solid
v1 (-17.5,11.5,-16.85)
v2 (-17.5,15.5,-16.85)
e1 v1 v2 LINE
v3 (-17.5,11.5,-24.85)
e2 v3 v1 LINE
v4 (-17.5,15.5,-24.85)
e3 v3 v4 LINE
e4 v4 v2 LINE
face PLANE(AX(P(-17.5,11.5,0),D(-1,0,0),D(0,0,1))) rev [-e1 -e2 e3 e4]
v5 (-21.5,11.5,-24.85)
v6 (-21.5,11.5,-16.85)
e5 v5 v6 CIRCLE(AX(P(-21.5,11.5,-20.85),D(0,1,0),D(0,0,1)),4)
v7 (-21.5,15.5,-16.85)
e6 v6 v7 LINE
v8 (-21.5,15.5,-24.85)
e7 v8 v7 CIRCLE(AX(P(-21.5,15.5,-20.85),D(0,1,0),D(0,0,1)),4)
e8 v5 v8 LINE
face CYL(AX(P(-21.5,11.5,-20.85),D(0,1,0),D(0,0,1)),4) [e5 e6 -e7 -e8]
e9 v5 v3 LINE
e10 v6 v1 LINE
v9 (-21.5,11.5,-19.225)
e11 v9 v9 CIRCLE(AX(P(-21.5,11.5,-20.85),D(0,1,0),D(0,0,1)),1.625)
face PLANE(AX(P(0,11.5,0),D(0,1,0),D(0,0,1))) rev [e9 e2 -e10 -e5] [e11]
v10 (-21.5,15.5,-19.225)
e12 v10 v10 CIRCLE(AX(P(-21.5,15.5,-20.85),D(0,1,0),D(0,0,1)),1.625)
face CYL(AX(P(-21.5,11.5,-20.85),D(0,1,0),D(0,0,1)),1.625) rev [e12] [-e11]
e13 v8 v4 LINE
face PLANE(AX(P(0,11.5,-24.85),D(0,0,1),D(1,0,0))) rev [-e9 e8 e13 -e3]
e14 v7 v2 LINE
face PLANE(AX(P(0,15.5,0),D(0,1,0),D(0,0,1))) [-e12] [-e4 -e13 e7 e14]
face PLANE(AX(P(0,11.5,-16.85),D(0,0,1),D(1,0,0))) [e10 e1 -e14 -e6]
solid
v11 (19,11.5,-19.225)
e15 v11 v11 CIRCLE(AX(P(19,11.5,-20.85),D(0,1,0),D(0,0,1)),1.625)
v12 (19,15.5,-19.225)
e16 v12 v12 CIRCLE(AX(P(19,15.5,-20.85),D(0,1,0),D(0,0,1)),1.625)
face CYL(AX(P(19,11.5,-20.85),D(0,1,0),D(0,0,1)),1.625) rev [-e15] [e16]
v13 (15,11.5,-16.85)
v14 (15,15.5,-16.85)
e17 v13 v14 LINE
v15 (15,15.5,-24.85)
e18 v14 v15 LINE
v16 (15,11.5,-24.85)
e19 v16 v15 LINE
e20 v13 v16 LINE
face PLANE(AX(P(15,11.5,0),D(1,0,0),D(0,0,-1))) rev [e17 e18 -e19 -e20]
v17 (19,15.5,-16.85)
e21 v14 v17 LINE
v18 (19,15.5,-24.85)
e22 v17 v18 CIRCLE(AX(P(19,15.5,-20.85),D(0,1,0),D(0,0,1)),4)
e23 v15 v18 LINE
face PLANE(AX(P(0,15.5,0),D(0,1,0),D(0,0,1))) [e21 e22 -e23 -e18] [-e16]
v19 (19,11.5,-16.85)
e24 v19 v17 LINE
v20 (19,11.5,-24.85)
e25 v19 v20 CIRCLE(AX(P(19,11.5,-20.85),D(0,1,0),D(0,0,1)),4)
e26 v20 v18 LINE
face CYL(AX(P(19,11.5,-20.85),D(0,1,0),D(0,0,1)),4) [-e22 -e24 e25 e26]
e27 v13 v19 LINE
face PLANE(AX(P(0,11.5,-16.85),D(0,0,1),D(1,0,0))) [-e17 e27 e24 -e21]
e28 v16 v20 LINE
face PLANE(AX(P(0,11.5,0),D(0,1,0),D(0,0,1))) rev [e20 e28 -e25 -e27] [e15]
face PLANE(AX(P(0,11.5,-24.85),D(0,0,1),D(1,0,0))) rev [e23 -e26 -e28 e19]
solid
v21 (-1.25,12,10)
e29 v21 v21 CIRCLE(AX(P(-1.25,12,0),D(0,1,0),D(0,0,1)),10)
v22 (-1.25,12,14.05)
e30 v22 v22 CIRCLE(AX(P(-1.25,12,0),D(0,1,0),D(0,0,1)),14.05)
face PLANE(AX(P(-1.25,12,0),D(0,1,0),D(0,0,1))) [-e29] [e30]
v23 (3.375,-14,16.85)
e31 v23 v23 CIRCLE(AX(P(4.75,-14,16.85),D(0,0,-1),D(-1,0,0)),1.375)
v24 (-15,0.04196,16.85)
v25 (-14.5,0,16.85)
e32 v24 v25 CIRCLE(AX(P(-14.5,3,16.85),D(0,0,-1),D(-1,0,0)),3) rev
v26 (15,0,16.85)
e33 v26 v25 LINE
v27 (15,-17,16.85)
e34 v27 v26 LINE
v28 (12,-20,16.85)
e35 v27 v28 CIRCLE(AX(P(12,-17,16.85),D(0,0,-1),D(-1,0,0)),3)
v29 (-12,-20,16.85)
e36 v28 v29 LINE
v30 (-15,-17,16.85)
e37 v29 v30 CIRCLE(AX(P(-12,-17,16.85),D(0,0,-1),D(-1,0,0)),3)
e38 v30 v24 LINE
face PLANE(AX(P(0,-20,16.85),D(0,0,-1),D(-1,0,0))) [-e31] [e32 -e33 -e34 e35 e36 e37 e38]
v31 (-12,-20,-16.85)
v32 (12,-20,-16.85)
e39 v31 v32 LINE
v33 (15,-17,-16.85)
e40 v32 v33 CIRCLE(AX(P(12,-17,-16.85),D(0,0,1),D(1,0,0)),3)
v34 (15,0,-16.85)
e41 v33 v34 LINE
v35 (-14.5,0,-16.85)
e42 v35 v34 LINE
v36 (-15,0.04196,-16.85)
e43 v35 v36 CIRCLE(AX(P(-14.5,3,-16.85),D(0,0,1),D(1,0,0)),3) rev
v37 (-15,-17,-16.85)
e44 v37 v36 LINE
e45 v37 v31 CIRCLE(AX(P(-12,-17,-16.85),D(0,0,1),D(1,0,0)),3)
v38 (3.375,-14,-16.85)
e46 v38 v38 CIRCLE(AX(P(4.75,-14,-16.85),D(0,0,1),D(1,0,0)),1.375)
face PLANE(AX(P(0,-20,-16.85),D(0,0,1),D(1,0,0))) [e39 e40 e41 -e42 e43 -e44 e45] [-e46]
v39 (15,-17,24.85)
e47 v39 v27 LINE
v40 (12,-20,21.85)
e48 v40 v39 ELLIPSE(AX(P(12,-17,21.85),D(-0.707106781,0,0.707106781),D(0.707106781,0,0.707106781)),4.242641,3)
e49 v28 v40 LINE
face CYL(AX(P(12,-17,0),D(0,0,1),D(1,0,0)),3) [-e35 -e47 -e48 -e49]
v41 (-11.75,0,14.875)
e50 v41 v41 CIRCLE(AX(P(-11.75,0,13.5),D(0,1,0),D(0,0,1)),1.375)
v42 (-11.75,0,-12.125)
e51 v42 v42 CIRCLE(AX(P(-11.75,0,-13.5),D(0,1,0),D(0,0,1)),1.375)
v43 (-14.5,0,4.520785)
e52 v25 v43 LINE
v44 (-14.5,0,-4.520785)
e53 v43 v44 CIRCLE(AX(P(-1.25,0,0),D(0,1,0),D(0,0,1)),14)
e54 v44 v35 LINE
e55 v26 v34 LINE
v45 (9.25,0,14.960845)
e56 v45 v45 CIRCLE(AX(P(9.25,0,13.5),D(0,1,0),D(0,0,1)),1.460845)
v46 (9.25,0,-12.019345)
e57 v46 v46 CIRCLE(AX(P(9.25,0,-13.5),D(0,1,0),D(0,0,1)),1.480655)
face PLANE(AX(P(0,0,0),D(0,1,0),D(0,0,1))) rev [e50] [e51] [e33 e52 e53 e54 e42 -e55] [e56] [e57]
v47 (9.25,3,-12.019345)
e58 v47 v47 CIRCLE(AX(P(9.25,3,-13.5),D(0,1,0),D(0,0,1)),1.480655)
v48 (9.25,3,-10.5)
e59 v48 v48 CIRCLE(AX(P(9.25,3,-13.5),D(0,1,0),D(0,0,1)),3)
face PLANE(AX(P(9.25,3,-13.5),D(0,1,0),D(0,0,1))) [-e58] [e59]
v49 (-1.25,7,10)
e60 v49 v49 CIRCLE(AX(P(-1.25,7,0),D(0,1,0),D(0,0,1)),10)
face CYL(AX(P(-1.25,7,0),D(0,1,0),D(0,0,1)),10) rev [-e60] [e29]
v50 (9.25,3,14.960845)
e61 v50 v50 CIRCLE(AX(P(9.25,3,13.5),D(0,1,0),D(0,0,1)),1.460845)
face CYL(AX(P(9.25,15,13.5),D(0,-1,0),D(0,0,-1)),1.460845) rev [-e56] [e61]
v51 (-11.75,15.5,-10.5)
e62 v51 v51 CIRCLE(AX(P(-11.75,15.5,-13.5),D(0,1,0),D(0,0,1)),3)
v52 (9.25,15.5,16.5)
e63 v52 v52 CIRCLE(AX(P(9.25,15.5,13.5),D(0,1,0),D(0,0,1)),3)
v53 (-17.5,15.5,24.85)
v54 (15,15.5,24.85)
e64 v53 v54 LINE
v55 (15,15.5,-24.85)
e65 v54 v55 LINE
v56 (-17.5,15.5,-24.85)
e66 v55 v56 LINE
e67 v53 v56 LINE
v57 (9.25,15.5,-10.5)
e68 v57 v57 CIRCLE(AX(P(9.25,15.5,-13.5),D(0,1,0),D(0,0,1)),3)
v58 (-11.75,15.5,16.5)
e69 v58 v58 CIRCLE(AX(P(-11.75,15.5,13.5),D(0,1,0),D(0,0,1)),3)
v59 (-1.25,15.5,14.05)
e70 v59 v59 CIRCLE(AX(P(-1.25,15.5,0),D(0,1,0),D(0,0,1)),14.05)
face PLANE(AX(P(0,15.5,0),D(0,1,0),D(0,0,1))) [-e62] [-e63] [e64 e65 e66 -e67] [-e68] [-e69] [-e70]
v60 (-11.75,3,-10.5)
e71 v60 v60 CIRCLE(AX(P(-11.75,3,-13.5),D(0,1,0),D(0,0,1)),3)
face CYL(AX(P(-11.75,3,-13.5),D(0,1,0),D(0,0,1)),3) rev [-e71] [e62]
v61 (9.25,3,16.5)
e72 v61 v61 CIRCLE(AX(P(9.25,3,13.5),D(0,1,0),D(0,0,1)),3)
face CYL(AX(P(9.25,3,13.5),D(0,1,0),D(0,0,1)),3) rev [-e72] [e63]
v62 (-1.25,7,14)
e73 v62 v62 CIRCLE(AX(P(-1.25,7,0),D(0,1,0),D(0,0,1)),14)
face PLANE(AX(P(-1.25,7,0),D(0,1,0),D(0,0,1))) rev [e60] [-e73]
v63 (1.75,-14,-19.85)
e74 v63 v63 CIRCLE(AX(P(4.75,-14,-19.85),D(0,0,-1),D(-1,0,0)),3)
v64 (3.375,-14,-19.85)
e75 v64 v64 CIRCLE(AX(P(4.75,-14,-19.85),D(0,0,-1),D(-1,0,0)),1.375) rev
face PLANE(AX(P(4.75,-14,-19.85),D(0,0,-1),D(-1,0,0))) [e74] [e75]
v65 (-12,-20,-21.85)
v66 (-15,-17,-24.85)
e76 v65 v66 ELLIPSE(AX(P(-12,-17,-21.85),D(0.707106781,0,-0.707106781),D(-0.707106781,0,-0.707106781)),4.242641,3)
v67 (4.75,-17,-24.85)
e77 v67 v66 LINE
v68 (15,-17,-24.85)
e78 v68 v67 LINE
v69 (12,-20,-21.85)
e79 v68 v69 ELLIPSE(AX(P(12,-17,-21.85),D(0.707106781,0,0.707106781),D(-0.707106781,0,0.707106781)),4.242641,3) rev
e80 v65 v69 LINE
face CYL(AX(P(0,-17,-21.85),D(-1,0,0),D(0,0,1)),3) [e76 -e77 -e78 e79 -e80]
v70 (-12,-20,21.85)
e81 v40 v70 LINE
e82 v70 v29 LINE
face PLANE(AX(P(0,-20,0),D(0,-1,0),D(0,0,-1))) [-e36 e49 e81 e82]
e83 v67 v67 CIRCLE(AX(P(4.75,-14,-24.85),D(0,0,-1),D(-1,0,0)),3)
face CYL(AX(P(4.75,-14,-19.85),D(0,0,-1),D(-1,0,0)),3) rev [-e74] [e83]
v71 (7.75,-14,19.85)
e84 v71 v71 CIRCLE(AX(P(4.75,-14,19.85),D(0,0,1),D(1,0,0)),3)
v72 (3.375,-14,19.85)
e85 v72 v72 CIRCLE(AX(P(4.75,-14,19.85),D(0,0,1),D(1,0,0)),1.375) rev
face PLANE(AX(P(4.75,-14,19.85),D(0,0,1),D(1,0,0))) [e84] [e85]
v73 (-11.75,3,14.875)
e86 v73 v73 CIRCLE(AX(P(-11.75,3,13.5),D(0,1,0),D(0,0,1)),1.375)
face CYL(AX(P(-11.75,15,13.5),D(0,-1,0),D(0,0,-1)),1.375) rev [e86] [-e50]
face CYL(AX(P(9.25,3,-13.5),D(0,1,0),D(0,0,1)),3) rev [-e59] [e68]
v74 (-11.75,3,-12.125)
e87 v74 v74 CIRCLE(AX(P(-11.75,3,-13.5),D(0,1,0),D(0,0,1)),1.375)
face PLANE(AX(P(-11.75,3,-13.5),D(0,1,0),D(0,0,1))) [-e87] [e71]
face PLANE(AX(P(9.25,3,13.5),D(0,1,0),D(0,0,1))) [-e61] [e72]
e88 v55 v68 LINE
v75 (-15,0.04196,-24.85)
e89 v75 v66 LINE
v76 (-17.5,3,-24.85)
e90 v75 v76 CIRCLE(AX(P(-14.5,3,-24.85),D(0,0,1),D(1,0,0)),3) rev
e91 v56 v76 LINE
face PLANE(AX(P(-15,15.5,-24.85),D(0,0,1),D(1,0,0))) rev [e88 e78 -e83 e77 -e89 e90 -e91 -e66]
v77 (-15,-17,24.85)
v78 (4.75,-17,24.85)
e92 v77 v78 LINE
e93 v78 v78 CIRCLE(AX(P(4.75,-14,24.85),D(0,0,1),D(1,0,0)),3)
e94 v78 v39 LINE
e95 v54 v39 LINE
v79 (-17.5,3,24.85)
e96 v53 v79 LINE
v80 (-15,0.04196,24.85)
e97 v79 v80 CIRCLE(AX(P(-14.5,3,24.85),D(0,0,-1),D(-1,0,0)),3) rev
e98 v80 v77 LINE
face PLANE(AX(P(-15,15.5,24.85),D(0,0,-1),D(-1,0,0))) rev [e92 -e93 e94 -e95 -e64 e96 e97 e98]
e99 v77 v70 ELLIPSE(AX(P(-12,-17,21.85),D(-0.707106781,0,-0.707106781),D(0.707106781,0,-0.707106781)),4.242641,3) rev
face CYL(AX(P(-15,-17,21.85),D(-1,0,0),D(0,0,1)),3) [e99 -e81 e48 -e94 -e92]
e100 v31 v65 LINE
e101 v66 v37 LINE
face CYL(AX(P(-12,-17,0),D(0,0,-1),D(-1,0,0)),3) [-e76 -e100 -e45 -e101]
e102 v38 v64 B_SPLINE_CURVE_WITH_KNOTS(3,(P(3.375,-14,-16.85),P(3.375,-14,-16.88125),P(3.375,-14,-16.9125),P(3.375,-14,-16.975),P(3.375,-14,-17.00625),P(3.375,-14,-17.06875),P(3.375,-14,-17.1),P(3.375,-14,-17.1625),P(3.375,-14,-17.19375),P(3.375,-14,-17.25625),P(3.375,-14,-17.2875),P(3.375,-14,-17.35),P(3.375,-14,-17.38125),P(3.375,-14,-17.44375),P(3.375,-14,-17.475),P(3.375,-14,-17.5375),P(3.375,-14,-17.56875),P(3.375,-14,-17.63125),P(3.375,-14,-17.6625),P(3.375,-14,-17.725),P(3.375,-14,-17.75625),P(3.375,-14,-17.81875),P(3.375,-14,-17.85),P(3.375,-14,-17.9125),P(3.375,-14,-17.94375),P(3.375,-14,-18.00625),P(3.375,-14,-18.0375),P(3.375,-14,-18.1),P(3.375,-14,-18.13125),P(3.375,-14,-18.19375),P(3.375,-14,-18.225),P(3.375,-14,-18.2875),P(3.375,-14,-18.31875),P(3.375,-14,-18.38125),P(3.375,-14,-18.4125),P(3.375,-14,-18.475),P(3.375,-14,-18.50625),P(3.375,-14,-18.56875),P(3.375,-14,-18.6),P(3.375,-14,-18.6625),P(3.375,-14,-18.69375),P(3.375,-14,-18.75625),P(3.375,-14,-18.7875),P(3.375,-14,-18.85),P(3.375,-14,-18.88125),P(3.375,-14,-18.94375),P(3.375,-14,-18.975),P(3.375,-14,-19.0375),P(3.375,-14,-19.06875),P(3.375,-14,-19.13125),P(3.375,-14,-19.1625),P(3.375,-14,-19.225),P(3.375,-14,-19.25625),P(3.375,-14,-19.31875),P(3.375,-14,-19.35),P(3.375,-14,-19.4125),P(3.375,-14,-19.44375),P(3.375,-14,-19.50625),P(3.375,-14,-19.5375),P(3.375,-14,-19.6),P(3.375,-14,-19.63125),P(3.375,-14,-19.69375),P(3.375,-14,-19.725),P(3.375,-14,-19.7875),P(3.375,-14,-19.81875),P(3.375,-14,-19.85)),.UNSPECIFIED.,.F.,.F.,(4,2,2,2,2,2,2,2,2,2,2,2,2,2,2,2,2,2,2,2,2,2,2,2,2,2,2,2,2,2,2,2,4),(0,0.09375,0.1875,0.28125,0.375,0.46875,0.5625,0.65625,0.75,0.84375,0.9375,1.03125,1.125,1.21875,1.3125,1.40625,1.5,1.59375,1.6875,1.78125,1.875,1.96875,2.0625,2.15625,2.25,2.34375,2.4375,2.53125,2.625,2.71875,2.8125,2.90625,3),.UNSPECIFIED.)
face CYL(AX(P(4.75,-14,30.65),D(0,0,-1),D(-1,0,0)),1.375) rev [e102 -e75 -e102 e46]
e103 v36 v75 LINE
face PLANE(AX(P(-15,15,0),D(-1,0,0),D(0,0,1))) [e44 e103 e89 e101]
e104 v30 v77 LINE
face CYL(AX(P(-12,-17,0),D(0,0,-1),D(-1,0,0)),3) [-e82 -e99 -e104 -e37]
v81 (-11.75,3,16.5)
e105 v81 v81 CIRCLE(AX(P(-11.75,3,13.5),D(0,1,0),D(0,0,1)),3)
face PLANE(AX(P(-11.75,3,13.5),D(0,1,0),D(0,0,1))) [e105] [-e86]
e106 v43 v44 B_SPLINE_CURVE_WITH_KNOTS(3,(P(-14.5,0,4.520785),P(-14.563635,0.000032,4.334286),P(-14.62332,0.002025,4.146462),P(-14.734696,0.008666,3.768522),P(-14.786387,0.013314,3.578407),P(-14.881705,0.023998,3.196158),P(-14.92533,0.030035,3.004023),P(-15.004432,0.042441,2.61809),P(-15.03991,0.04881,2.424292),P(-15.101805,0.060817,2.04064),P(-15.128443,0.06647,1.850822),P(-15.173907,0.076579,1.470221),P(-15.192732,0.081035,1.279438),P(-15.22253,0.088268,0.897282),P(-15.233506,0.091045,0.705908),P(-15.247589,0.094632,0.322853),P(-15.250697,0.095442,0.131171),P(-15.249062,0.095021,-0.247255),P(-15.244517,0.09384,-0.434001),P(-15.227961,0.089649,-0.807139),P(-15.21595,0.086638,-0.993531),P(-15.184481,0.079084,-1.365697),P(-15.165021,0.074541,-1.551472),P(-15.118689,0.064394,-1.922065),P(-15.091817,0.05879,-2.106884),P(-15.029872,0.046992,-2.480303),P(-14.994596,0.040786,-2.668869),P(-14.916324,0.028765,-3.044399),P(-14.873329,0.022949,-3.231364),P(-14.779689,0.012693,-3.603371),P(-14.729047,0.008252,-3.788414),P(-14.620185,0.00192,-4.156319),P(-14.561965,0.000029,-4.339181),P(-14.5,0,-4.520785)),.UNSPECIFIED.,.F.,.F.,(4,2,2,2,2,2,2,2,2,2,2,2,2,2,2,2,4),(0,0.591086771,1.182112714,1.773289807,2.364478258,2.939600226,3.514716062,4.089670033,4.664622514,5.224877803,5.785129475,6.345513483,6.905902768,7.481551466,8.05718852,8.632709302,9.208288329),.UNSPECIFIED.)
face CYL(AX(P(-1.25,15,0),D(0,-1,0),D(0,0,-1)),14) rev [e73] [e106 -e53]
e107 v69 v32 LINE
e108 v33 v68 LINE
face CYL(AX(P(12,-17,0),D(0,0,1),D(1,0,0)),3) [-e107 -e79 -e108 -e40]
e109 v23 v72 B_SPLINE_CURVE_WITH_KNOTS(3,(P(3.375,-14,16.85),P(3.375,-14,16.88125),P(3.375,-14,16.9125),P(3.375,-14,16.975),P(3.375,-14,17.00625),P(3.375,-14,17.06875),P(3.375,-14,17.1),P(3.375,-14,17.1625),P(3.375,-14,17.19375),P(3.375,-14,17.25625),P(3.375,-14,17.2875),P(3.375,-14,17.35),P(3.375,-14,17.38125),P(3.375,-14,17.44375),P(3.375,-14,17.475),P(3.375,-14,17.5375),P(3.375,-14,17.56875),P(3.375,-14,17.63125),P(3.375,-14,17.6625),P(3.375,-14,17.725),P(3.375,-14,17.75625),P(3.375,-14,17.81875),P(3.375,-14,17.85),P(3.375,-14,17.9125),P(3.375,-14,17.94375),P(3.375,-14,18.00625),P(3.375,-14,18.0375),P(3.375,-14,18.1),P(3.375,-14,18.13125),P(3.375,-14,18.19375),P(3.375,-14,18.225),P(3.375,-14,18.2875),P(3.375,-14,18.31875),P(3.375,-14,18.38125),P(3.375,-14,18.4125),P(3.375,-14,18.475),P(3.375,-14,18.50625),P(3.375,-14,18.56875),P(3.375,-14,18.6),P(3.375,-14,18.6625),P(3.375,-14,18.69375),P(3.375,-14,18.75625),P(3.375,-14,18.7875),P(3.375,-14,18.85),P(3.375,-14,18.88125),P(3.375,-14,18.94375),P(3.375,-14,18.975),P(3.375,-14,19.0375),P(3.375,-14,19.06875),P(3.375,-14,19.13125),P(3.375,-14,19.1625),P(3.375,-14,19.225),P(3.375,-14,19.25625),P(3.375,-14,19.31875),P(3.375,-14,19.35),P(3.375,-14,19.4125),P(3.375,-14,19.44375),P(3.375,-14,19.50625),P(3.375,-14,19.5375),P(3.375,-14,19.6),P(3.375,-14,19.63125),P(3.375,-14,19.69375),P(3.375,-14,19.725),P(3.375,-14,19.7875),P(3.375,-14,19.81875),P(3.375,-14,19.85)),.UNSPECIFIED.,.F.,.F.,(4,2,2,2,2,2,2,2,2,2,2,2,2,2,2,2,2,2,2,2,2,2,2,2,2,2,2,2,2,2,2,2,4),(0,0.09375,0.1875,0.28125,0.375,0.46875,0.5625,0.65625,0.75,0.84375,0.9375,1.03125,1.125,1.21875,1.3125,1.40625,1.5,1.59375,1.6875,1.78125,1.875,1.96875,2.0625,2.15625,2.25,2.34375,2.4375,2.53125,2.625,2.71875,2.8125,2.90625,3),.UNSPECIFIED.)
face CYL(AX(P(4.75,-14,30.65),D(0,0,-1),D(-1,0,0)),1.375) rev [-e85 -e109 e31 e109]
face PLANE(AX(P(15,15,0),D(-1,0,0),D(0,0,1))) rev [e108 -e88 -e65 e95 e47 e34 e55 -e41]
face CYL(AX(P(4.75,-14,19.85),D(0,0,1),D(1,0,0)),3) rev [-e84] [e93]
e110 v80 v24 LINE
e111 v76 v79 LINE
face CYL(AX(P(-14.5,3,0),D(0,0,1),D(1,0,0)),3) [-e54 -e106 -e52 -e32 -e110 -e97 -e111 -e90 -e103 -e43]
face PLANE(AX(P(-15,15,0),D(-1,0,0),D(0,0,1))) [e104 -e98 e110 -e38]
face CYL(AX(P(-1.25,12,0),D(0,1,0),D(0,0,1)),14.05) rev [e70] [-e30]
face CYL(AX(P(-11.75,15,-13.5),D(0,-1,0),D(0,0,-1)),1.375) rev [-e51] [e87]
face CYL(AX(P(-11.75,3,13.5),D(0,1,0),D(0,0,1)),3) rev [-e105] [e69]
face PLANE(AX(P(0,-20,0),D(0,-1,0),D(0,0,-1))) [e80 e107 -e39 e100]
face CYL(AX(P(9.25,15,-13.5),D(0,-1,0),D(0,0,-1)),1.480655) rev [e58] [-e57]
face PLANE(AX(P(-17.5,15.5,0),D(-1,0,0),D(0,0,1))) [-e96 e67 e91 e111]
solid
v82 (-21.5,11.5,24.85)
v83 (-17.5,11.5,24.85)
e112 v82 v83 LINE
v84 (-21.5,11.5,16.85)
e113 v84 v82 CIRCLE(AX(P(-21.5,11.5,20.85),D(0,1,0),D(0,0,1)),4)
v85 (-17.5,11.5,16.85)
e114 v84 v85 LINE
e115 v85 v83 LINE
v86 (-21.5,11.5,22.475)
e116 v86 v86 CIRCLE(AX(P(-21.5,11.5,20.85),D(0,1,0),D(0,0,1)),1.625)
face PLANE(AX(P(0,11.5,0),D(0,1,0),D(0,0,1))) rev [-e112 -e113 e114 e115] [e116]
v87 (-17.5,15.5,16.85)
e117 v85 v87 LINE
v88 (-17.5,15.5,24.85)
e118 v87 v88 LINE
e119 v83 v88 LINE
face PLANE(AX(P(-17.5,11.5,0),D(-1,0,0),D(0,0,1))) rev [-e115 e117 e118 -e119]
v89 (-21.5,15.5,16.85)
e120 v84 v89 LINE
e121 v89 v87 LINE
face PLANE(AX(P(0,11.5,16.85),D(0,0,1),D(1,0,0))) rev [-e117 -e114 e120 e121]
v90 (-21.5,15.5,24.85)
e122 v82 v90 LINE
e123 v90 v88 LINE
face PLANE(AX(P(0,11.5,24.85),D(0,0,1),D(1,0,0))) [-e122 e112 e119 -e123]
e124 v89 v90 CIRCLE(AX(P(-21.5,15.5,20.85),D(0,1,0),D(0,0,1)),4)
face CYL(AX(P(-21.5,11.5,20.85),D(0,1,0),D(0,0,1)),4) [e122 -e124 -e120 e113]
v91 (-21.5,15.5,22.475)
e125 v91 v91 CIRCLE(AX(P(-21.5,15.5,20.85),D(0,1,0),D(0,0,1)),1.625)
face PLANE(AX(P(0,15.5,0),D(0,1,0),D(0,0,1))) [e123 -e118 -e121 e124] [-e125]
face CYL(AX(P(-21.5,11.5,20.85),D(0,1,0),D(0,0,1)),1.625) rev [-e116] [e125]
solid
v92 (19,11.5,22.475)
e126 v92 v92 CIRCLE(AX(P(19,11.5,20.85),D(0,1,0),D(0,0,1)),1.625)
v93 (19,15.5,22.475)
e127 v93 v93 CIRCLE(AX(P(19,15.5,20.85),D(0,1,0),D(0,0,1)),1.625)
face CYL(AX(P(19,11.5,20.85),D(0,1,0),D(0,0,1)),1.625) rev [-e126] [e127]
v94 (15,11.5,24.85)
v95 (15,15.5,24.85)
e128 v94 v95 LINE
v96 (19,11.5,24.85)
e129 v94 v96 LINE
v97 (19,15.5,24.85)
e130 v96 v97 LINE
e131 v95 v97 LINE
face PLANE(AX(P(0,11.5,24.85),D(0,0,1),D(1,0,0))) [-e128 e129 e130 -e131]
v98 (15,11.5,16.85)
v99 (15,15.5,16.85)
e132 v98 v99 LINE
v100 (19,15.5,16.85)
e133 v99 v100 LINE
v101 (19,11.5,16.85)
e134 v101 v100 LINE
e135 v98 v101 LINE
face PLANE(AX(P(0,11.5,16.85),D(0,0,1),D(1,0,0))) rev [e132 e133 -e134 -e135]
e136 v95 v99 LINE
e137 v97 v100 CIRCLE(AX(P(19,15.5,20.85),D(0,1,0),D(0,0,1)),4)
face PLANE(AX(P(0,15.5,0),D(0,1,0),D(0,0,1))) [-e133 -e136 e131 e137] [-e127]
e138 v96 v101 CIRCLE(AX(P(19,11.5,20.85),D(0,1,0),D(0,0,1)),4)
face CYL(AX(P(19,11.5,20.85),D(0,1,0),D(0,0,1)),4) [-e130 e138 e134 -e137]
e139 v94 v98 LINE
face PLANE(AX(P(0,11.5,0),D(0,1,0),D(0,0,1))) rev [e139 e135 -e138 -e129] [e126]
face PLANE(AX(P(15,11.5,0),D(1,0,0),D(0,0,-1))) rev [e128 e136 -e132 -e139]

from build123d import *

# Parameters (mm, degrees)
SKETCH1_R             = 1.375
SKETCH1_R_2           = 1.460845326
SKETCH1_R_3           = 1.480655282
BOSS_EXTRUDE1_DEPTH   = 15
BOSS_EXTRUDE2_START   = -8
SKETCH2_R             = 14
SKETCH2_R_2           = 10
BOSS_EXTRUDE2_DEPTH   = 8
CUT_EXTRUDE1_START    = -3
SKETCH3_R             = 14
SKETCH3_R_2           = 10
CUT_EXTRUDE1_DEPTH    = 3
SKETCH5_R             = 1.480655282
SKETCH5_R_2           = 1.375
SKETCH5_R_3           = 1.460845326
BOSS_EXTRUDE3_DEPTH   = 0.5
BOSS_EXTRUDE4_DEPTH   = 5
SKETCH7_R             = 3
CUT_EXTRUDE2_DEPTH    = 12.5
SKETCH8_R             = 14.05
CUT_EXTRUDE3_DEPTH    = 3.5
SKETCH9_W             = 30
SKETCH9_H             = 8
BOSS_EXTRUDE6_DEPTH   = 20
BOSS_EXTRUDE6_2_DEPTH = 20
SKETCH10_W            = 30
SKETCH10_H            = 8
BOSS_EXTRUDE7_DEPTH   = 15.5
BOSS_EXTRUDE14_DEPTH  = 15.5
CUT_EXTRUDE11_START   = 15.5
SKETCH16_R            = 14.05
CUT_EXTRUDE11_DEPTH   = 15.5
SKETCH17_R            = 4
SKETCH17_R_2          = 1.625
BOSS_EXTRUDE15_DEPTH  = 4
SKETCH18_R            = 1.375
CUT_EXTRUDE12_DEPTH   = 55.5
SKETCH19_R            = 3
CUT_EXTRUDE13_DEPTH   = 5
CUT_EXTRUDE14_START   = -5
SKETCH20_R            = 3
CUT_EXTRUDE14_DEPTH   = 5
FILLET1_R             = 3
FILLET2_R             = 3


# Some blends are built 0.0001 mm under size
with BuildPart() as part:
    # Sketch1 → Boss-Extrude1 (new body)
    with BuildSketch(Plane(origin=(0, 0, 0), x_dir=(1, 0, 0), z_dir=(0, 1, 0))):
        with BuildLine():
            Line((-15, -16.85), (15, -16.85))
            Line((15, -16.85), (15, 16.85))
            Line((15, 16.85), (-15, 16.85))
            Line((-15, 16.85), (-15, 2.633913438))
            ThreePointArc((-15, 2.633913438), (0.072875656, 13.937359865), (12.75, 0))
            ThreePointArc((12.75, 0), (0.072875656, -13.937359865), (-15, -2.633913438))
            Line((-15, -2.633913438), (-15, -16.85))
        make_face()
        with Locations(Location((-11.75, -13.5, 0), (0, 0, 270))):
            Circle(SKETCH1_R, mode=Mode.SUBTRACT)
        with Locations(Location((9.25, -13.5, 0), (0, 0, 270))):
            Circle(SKETCH1_R_2, mode=Mode.SUBTRACT)
        with Locations(Location((-11.75, 13.5, 0), (0, 0, 270))):
            Circle(SKETCH1_R, mode=Mode.SUBTRACT)
        with Locations(Location((9.25, 13.5, 0), (0, 0, 270))):
            Circle(SKETCH1_R_3, mode=Mode.SUBTRACT)
    extrude(amount=BOSS_EXTRUDE1_DEPTH)

    # Sketch2 → Boss-Extrude2 (add)
    with BuildSketch(Plane(origin=(0, 15, 0), x_dir=(1, 0, 0), z_dir=(0, 1, 0)).offset(BOSS_EXTRUDE2_START)):
        with Locations((-1.25, 0)):
            Circle(SKETCH2_R)
        with Locations(Location((-1.25, 0, 0), (0, 0, 270))):
            Circle(SKETCH2_R_2, mode=Mode.SUBTRACT)
    extrude(amount=BOSS_EXTRUDE2_DEPTH)

    # Sketch3 → Cut-Extrude1 (cut)
    with BuildSketch(Plane(origin=(0, 15, 0), x_dir=(1, 0, 0), z_dir=(0, 1, 0)).offset(CUT_EXTRUDE1_START)):
        with Locations((-1.25, 0)):
            Circle(SKETCH3_R)
        with Locations(Location((-1.25, 0, 0), (0, 0, 270))):
            Circle(SKETCH3_R_2, mode=Mode.SUBTRACT)
    extrude(amount=CUT_EXTRUDE1_DEPTH, mode=Mode.SUBTRACT)

    # Sketch5 → Boss-Extrude3 (add)
    with BuildSketch(Plane(origin=(0, 15, 0), x_dir=(1, 0, 0), z_dir=(0, 1, 0))):
        with BuildLine():
            Line((-15, 16.85), (-15, 2.633913438))
            ThreePointArc((-15, 2.633913438), (12.75, 0), (-15, -2.633913438))
            Line((-15, -2.633913438), (-15, -16.85))
            Line((-15, -16.85), (15, -16.85))
            Line((15, -16.85), (15, 16.85))
            Line((15, 16.85), (-15, 16.85))
        make_face()
        with Locations(Location((9.25, 13.5, 0), (0, 0, 270))):
            Circle(SKETCH5_R, mode=Mode.SUBTRACT)
        with Locations(Location((-11.75, -13.5, 0), (0, 0, 270))):
            Circle(SKETCH5_R_2, mode=Mode.SUBTRACT)
        with Locations(Location((-11.75, 13.5, 0), (0, 0, 270))):
            Circle(SKETCH5_R_2, mode=Mode.SUBTRACT)
        with Locations(Location((9.25, -13.5, 0), (0, 0, 270))):
            Circle(SKETCH5_R_3, mode=Mode.SUBTRACT)
    extrude(amount=BOSS_EXTRUDE3_DEPTH)

    # Sketch6 → Boss-Extrude4 (add)
    with BuildSketch(Plane(origin=(0, 15.5, 0), x_dir=(1, 0, 0), z_dir=(0, 1, 0))):
        with BuildLine():
            ThreePointArc((-1.625, 20.35), (0, 21.975), (1.625, 20.35))
            Line((1.625, 20.35), (3.5, 20.35))
            ThreePointArc((3.5, 20.35), (0, 23.85), (-3.5, 20.35))
            Line((-3.5, 20.35), (-1.625, 20.35))
        make_face()
        with BuildLine():
            Line((3.5, 20.35), (1.625, 20.35))
            ThreePointArc((1.625, 20.35), (0, 18.725), (-1.625, 20.35))
            Line((-1.625, 20.35), (-3.5, 20.35))
            ThreePointArc((-3.5, 20.35), (-2.474873743, 17.875126275), (-2.6e-08, 16.85))
            ThreePointArc((-2.6e-08, 16.85), (2.474873725, 17.875126257), (3.5, 20.35))
        make_face()
        with BuildLine():
            Line((3.5, 16.85), (3.5, 20.35))
            ThreePointArc((3.5, 20.35), (2.474873725, 17.875126257), (-2.6e-08, 16.85))
            Line((-2.6e-08, 16.85), (3.5, 16.85))
        make_face()
        with BuildLine():
            ThreePointArc((-2.6e-08, 16.85), (-2.474873743, 17.875126275), (-3.5, 20.35))
            Line((-3.5, 20.35), (-3.5, 16.85))
            Line((-3.5, 16.85), (-2.6e-08, 16.85))
        make_face()
        with BuildLine():
            ThreePointArc((-3.5, -20.35), (-2.474873734, -17.875126266), (0, -16.85))
            Line((0, -16.85), (-3.5, -16.85))
            Line((-3.5, -16.85), (-3.5, -20.35))
        make_face()
        with BuildLine():
            Line((3.5, -20.35), (3.5, -16.85))
            Line((3.5, -16.85), (0, -16.85))
            ThreePointArc((0, -16.85), (2.474873734, -17.875126266), (3.5, -20.35))
        make_face()
        with BuildLine():
            ThreePointArc((-3.5, -20.35), (0, -23.85), (3.5, -20.35))
            Line((3.5, -20.35), (1.625, -20.35))
            ThreePointArc((1.625, -20.35), (0, -21.975), (-1.625, -20.35))
            Line((-1.625, -20.35), (-3.5, -20.35))
        make_face()
        with BuildLine():
            Line((1.625, -20.35), (3.5, -20.35))
            ThreePointArc((3.5, -20.35), (2.474873734, -17.875126266), (0, -16.85))
            ThreePointArc((0, -16.85), (-2.474873734, -17.875126266), (-3.5, -20.35))
            Line((-3.5, -20.35), (-1.625, -20.35))
            ThreePointArc((-1.625, -20.35), (0, -18.725), (1.625, -20.35))
        make_face()
    extrude(amount=-BOSS_EXTRUDE4_DEPTH)

    # Sketch7 → Cut-Extrude2 (cut)
    with BuildSketch(Plane(origin=(0, 15.5, 0), x_dir=(1, 0, 0), z_dir=(0, 1, 0))):
        with Locations(Location((-11.75, 13.5, 0), (0, 0, 270))):
            Circle(SKETCH7_R)
        with Locations(Location((9.25, 13.5, 0), (0, 0, 270))):
            Circle(SKETCH7_R)
        with Locations(Location((9.25, -13.5, 0), (0, 0, 270))):
            Circle(SKETCH7_R)
        with Locations(Location((-11.75, -13.5, 0), (0, 0, 270))):
            Circle(SKETCH7_R)
    extrude(amount=-CUT_EXTRUDE2_DEPTH, mode=Mode.SUBTRACT)

    # Sketch8 → Cut-Extrude3 (cut)
    with BuildSketch(Plane(origin=(0, 15.5, 0), x_dir=(1, 0, 0), z_dir=(0, 1, 0))):
        with Locations((-1.25, 0)):
            Circle(SKETCH8_R)
    extrude(amount=-CUT_EXTRUDE3_DEPTH, mode=Mode.SUBTRACT)



with BuildPart() as body_2:
    # Sketch9 → Boss-Extrude6 (new body)
    with BuildSketch(Plane.XZ):
        with Locations((0, 20.85)):
            Rectangle(SKETCH9_W, SKETCH9_H)
    extrude(amount=BOSS_EXTRUDE6_DEPTH)


with BuildPart() as body_3:
    # Sketch9 → Boss-Extrude6 2 (new body)
    with BuildSketch(Plane.XZ):
        with Locations((0, -20.85)):
            Rectangle(SKETCH9_W, SKETCH9_H)
    extrude(amount=BOSS_EXTRUDE6_2_DEPTH)


with BuildPart() as part_1:
    add(part.part)

    add(body_2.part)  # Boss-Extrude7 merges body 2

    add(body_3.part)  # Boss-Extrude7 merges body 3
    # Sketch10 → Boss-Extrude7 (add)
    with BuildSketch(Plane(origin=(0, 0, 0), x_dir=(1, 0, 0), z_dir=(0, 1, 0))):
        with Locations((0, 20.85)):
            Rectangle(SKETCH10_W, SKETCH10_H)
        with Locations((0, -20.85)):
            Rectangle(SKETCH10_W, SKETCH10_H)
    extrude(amount=BOSS_EXTRUDE7_DEPTH)

    # Sketch15 → Boss-Extrude14 (add)
    with BuildSketch(Plane.XZ):
        with BuildLine():
            Line((-15, 24.85), (-17.5, 24.85))
            Line((-17.5, 24.85), (-17.5, -24.85))
            Line((-17.5, -24.85), (-15, -24.85))
            Line((-15, -24.85), (-15, -16.85))
            Line((-15, -16.85), (-15, -2.633913438))
            ThreePointArc((-15, -2.633913438), (-15.25, 0), (-15, 2.633913438))
            Line((-15, 2.633913438), (-15, 16.85))
            Line((-15, 16.85), (-15, 24.85))
        make_face()
    extrude(amount=-BOSS_EXTRUDE14_DEPTH)

    # Sketch16 → Cut-Extrude11 (cut)
    with BuildSketch(Plane(origin=(0, 12, 0), x_dir=(1, 0, 0), z_dir=(0, 1, 0)).offset(CUT_EXTRUDE11_START)):
        with Locations(Location((-1.25, 0, 0), (0, 0, 270))):
            Circle(SKETCH16_R)
    extrude(amount=-CUT_EXTRUDE11_DEPTH, mode=Mode.SUBTRACT)

    # Sketch18 → Cut-Extrude12 (cut)
    with BuildSketch(Plane(origin=(0, 0, -24.85), x_dir=(-1, 0, 0), z_dir=(0, 0, -1))):
        with Locations((-4.75, -14)):
            Circle(SKETCH18_R)
    extrude(amount=-CUT_EXTRUDE12_DEPTH, mode=Mode.SUBTRACT)

    # Sketch19 → Cut-Extrude13 (cut)
    with BuildSketch(Plane.XY.offset(24.85)):
        with Locations((4.75, -14)):
            Circle(SKETCH19_R)
    extrude(amount=-CUT_EXTRUDE13_DEPTH, mode=Mode.SUBTRACT)

    # Sketch20 → Cut-Extrude14 (cut)
    with BuildSketch(Plane(origin=(0, 0, -24.85), x_dir=(-1, 0, 0), z_dir=(0, 0, -1)).offset(CUT_EXTRUDE14_START)):
        with Locations(Location((-4.75, -14, 0), (0, 0, 180))):
            Circle(SKETCH20_R)
    extrude(amount=CUT_EXTRUDE14_DEPTH, mode=Mode.SUBTRACT)

    # Fillet1
    # the kernel refuses this fillet: 3 mm, written as the material it takes off along each edge
    with BuildSketch(Plane(origin=(-17.5, 0, 32.35), x_dir=(1, 0, 0), z_dir=(0, 0, -1))) as fillet1_piece_1_section:
        with BuildLine():
            CenterArc((FILLET1_R, -FILLET1_R), FILLET1_R, 90, 90)
            Line((0, -FILLET1_R), (0, 0))
            Line((0, 0), (FILLET1_R, 0))
        make_face()
    fillet1_piece_1 = extrude(amount=64.7, mode=Mode.PRIVATE)
    fillet1_piece_1 = split(fillet1_piece_1, bisect_by=Plane(origin=(-15, 0.690666213, 24.6), z_dir=(-1, 0, 0)), keep=Keep.TOP, mode=Mode.PRIVATE)
    fillet1_piece_1 = split(fillet1_piece_1, bisect_by=Plane(origin=(-16.854336026, 0.690666213, 16.85), z_dir=(0, 0, 1)), keep=Keep.TOP, mode=Mode.PRIVATE)
    add(fillet1_piece_1, mode=Mode.SUBTRACT)
    with BuildSketch(Plane(origin=(-17.5, 0, 32.35), x_dir=(1, 0, 0), z_dir=(0, 0, -1))) as fillet1_piece_2_section:
        with BuildLine():
            CenterArc((FILLET1_R, -FILLET1_R), FILLET1_R, 90, 90)
            Line((0, -FILLET1_R), (0, 0))
            Line((0, 0), (FILLET1_R, 0))
        make_face()
    fillet1_piece_2 = extrude(amount=64.7, mode=Mode.PRIVATE)
    fillet1_piece_2 = split(fillet1_piece_2, bisect_by=Plane(origin=(-15, -0.021970268, 0), z_dir=(1, 0, 0)), keep=Keep.TOP, mode=Mode.PRIVATE)
    fillet1_piece_2 = split(fillet1_piece_2, bisect_by=Plane(origin=(-14.773609576, -0.021970268, 16.85), z_dir=(0, 0, -1)), keep=Keep.TOP, mode=Mode.PRIVATE)
    fillet1_piece_2 = split(fillet1_piece_2, bisect_by=Plane(origin=(-14.773609576, -0.021970268, -16.85), z_dir=(0, 0, 1)), keep=Keep.TOP, mode=Mode.PRIVATE)
    add(fillet1_piece_2, mode=Mode.SUBTRACT)
    with BuildSketch(Plane(origin=(-17.5, 0, 32.35), x_dir=(1, 0, 0), z_dir=(0, 0, -1))) as fillet1_piece_3_section:
        with BuildLine():
            CenterArc((FILLET1_R, -FILLET1_R), FILLET1_R, 90, 90)
            Line((0, -FILLET1_R), (0, 0))
            Line((0, 0), (FILLET1_R, 0))
        make_face()
    fillet1_piece_3 = extrude(amount=64.7, mode=Mode.PRIVATE)
    fillet1_piece_3 = split(fillet1_piece_3, bisect_by=Plane(origin=(-15, 0.690666213, 0), z_dir=(-1, 0, 0)), keep=Keep.TOP, mode=Mode.PRIVATE)
    fillet1_piece_3 = split(fillet1_piece_3, bisect_by=Plane(origin=(-16.854336026, 0.690666213, 16.85), z_dir=(0, 0, -1)), keep=Keep.TOP, mode=Mode.PRIVATE)
    fillet1_piece_3 = split(fillet1_piece_3, bisect_by=Plane(origin=(-16.854336026, 0.690666213, -16.85), z_dir=(0, 0, 1)), keep=Keep.TOP, mode=Mode.PRIVATE)
    add(fillet1_piece_3, mode=Mode.SUBTRACT)
    with BuildSketch(Plane(origin=(-17.5, 0, 32.35), x_dir=(1, 0, 0), z_dir=(0, 0, -1))) as fillet1_piece_4_section:
        with BuildLine():
            CenterArc((FILLET1_R, -FILLET1_R), FILLET1_R, 90, 90)
            Line((0, -FILLET1_R), (0, 0))
            Line((0, 0), (FILLET1_R, 0))
        make_face()
    fillet1_piece_4 = extrude(amount=64.7, mode=Mode.PRIVATE)
    fillet1_piece_4 = split(fillet1_piece_4, bisect_by=Plane(origin=(-15, 0.690666213, -24.6), z_dir=(-1, 0, 0)), keep=Keep.TOP, mode=Mode.PRIVATE)
    fillet1_piece_4 = split(fillet1_piece_4, bisect_by=Plane(origin=(-16.854336026, 0.690666213, -16.85), z_dir=(0, 0, -1)), keep=Keep.TOP, mode=Mode.PRIVATE)
    add(fillet1_piece_4, mode=Mode.SUBTRACT)

    # Fillet2
    fillet2_edges = [part_1.edges().sort_by_distance(p)[0] for p in [
        (15, -20, -20.85),
        (-15, -20, -20.85),
        (0, -20, -24.85),
        (15, -20, 20.85),
        (0, -20, 24.85),
        (-15, -20, 20.85),
    ]]
    fillet(fillet2_edges, radius=FILLET2_R - 0.0001)  # a hair under: the kernel refuses the full size


with BuildPart() as body_2_2:
    # Sketch17 → Boss-Extrude15 (new body)
    # profile 1 of 12: a face of its own
    with BuildSketch(Plane(origin=(0, 15.5, 0), x_dir=(1, 0, 0), z_dir=(0, 1, 0))):
        with Locations((-21.5, 20.85)):
            Circle(SKETCH17_R)
        with Locations(Location((-21.5, 20.85, 0), (0, 0, 270))):
            Circle(SKETCH17_R_2, mode=Mode.SUBTRACT)
    # profile 2 of 12: a face of its own
    with BuildSketch(Plane(origin=(0, 15.5, 0), x_dir=(1, 0, 0), z_dir=(0, 1, 0))):
        with BuildLine():
            Line((-17.5, -20.85), (-17.5, -16.85))
            Line((-17.5, -16.85), (-21.5, -16.85))
            ThreePointArc((-21.5, -16.85), (-18.671572875, -18.021572875), (-17.5, -20.85))
        make_face()
    # profile 3 of 12: a face of its own
    with BuildSketch(Plane(origin=(0, 15.5, 0), x_dir=(1, 0, 0), z_dir=(0, 1, 0))):
        with BuildLine():
            Line((-17.5, -24.85), (-17.5, -20.85))
            ThreePointArc((-17.5, -20.85), (-18.671572875, -23.678427125), (-21.5, -24.85))
            Line((-21.5, -24.85), (-17.5, -24.85))
        make_face()
    # profile 4 of 12: a face of its own
    with BuildSketch(Plane(origin=(0, 15.5, 0), x_dir=(1, 0, 0), z_dir=(0, 1, 0))):
        with Locations((-21.5, -20.85)):
            Circle(SKETCH17_R)
        with Locations(Location((-21.5, -20.85, 0), (0, 0, 270))):
            Circle(SKETCH17_R_2, mode=Mode.SUBTRACT)
    # profile 5 of 12: a face of its own
    with BuildSketch(Plane(origin=(0, 15.5, 0), x_dir=(1, 0, 0), z_dir=(0, 1, 0))):
        with BuildLine():
            Line((19, -16.85), (15, -16.85))
            Line((15, -16.85), (15, -20.85))
            ThreePointArc((15, -20.85), (16.171572875, -18.021572875), (19, -16.85))
        make_face()
    # profile 6 of 12: a face of its own
    with BuildSketch(Plane(origin=(0, 15.5, 0), x_dir=(1, 0, 0), z_dir=(0, 1, 0))):
        with Locations((19, -20.85)):
            Circle(SKETCH17_R)
        with Locations(Location((19, -20.85, 0), (0, 0, 270))):
            Circle(SKETCH17_R_2, mode=Mode.SUBTRACT)
    # profile 7 of 12: a face of its own
    with BuildSketch(Plane(origin=(0, 15.5, 0), x_dir=(1, 0, 0), z_dir=(0, 1, 0))):
        with BuildLine():
            ThreePointArc((19, -24.85), (16.171572875, -23.678427125), (15, -20.85))
            Line((15, -20.85), (15, -24.85))
            Line((15, -24.85), (19, -24.85))
        make_face()
    # profile 8 of 12: a face of its own
    with BuildSketch(Plane(origin=(0, 15.5, 0), x_dir=(1, 0, 0), z_dir=(0, 1, 0))):
        with Locations((19, 20.85)):
            Circle(SKETCH17_R)
        with Locations(Location((19, 20.85, 0), (0, 0, 270))):
            Circle(SKETCH17_R_2, mode=Mode.SUBTRACT)
    # profile 9 of 12: a face of its own
    with BuildSketch(Plane(origin=(0, 15.5, 0), x_dir=(1, 0, 0), z_dir=(0, 1, 0))):
        with BuildLine():
            Line((19, 24.85), (15, 24.85))
            Line((15, 24.85), (15, 20.85))
            ThreePointArc((15, 20.85), (16.171572875, 23.678427125), (19, 24.85))
        make_face()
    # profile 10 of 12: a face of its own
    with BuildSketch(Plane(origin=(0, 15.5, 0), x_dir=(1, 0, 0), z_dir=(0, 1, 0))):
        with BuildLine():
            ThreePointArc((19, 16.85), (16.171572875, 18.021572875), (15, 20.85))
            Line((15, 20.85), (15, 16.85))
            Line((15, 16.85), (19, 16.85))
        make_face()
    # profile 11 of 12: a face of its own
    with BuildSketch(Plane(origin=(0, 15.5, 0), x_dir=(1, 0, 0), z_dir=(0, 1, 0))):
        with BuildLine():
            Line((-17.5, 16.85), (-17.5, 20.85))
            ThreePointArc((-17.5, 20.85), (-18.671572875, 18.021572875), (-21.5, 16.85))
            Line((-21.5, 16.85), (-17.5, 16.85))
        make_face()
    # profile 12 of 12: a face of its own
    with BuildSketch(Plane(origin=(0, 15.5, 0), x_dir=(1, 0, 0), z_dir=(0, 1, 0))):
        with BuildLine():
            Line((-17.5, 24.85), (-21.5, 24.85))
            ThreePointArc((-21.5, 24.85), (-18.671572875, 23.678427125), (-17.5, 20.85))
            Line((-17.5, 20.85), (-17.5, 24.85))
        make_face()
    extrude(amount=-BOSS_EXTRUDE15_DEPTH)


solid = Compound([part_1.part, body_2_2.part])
